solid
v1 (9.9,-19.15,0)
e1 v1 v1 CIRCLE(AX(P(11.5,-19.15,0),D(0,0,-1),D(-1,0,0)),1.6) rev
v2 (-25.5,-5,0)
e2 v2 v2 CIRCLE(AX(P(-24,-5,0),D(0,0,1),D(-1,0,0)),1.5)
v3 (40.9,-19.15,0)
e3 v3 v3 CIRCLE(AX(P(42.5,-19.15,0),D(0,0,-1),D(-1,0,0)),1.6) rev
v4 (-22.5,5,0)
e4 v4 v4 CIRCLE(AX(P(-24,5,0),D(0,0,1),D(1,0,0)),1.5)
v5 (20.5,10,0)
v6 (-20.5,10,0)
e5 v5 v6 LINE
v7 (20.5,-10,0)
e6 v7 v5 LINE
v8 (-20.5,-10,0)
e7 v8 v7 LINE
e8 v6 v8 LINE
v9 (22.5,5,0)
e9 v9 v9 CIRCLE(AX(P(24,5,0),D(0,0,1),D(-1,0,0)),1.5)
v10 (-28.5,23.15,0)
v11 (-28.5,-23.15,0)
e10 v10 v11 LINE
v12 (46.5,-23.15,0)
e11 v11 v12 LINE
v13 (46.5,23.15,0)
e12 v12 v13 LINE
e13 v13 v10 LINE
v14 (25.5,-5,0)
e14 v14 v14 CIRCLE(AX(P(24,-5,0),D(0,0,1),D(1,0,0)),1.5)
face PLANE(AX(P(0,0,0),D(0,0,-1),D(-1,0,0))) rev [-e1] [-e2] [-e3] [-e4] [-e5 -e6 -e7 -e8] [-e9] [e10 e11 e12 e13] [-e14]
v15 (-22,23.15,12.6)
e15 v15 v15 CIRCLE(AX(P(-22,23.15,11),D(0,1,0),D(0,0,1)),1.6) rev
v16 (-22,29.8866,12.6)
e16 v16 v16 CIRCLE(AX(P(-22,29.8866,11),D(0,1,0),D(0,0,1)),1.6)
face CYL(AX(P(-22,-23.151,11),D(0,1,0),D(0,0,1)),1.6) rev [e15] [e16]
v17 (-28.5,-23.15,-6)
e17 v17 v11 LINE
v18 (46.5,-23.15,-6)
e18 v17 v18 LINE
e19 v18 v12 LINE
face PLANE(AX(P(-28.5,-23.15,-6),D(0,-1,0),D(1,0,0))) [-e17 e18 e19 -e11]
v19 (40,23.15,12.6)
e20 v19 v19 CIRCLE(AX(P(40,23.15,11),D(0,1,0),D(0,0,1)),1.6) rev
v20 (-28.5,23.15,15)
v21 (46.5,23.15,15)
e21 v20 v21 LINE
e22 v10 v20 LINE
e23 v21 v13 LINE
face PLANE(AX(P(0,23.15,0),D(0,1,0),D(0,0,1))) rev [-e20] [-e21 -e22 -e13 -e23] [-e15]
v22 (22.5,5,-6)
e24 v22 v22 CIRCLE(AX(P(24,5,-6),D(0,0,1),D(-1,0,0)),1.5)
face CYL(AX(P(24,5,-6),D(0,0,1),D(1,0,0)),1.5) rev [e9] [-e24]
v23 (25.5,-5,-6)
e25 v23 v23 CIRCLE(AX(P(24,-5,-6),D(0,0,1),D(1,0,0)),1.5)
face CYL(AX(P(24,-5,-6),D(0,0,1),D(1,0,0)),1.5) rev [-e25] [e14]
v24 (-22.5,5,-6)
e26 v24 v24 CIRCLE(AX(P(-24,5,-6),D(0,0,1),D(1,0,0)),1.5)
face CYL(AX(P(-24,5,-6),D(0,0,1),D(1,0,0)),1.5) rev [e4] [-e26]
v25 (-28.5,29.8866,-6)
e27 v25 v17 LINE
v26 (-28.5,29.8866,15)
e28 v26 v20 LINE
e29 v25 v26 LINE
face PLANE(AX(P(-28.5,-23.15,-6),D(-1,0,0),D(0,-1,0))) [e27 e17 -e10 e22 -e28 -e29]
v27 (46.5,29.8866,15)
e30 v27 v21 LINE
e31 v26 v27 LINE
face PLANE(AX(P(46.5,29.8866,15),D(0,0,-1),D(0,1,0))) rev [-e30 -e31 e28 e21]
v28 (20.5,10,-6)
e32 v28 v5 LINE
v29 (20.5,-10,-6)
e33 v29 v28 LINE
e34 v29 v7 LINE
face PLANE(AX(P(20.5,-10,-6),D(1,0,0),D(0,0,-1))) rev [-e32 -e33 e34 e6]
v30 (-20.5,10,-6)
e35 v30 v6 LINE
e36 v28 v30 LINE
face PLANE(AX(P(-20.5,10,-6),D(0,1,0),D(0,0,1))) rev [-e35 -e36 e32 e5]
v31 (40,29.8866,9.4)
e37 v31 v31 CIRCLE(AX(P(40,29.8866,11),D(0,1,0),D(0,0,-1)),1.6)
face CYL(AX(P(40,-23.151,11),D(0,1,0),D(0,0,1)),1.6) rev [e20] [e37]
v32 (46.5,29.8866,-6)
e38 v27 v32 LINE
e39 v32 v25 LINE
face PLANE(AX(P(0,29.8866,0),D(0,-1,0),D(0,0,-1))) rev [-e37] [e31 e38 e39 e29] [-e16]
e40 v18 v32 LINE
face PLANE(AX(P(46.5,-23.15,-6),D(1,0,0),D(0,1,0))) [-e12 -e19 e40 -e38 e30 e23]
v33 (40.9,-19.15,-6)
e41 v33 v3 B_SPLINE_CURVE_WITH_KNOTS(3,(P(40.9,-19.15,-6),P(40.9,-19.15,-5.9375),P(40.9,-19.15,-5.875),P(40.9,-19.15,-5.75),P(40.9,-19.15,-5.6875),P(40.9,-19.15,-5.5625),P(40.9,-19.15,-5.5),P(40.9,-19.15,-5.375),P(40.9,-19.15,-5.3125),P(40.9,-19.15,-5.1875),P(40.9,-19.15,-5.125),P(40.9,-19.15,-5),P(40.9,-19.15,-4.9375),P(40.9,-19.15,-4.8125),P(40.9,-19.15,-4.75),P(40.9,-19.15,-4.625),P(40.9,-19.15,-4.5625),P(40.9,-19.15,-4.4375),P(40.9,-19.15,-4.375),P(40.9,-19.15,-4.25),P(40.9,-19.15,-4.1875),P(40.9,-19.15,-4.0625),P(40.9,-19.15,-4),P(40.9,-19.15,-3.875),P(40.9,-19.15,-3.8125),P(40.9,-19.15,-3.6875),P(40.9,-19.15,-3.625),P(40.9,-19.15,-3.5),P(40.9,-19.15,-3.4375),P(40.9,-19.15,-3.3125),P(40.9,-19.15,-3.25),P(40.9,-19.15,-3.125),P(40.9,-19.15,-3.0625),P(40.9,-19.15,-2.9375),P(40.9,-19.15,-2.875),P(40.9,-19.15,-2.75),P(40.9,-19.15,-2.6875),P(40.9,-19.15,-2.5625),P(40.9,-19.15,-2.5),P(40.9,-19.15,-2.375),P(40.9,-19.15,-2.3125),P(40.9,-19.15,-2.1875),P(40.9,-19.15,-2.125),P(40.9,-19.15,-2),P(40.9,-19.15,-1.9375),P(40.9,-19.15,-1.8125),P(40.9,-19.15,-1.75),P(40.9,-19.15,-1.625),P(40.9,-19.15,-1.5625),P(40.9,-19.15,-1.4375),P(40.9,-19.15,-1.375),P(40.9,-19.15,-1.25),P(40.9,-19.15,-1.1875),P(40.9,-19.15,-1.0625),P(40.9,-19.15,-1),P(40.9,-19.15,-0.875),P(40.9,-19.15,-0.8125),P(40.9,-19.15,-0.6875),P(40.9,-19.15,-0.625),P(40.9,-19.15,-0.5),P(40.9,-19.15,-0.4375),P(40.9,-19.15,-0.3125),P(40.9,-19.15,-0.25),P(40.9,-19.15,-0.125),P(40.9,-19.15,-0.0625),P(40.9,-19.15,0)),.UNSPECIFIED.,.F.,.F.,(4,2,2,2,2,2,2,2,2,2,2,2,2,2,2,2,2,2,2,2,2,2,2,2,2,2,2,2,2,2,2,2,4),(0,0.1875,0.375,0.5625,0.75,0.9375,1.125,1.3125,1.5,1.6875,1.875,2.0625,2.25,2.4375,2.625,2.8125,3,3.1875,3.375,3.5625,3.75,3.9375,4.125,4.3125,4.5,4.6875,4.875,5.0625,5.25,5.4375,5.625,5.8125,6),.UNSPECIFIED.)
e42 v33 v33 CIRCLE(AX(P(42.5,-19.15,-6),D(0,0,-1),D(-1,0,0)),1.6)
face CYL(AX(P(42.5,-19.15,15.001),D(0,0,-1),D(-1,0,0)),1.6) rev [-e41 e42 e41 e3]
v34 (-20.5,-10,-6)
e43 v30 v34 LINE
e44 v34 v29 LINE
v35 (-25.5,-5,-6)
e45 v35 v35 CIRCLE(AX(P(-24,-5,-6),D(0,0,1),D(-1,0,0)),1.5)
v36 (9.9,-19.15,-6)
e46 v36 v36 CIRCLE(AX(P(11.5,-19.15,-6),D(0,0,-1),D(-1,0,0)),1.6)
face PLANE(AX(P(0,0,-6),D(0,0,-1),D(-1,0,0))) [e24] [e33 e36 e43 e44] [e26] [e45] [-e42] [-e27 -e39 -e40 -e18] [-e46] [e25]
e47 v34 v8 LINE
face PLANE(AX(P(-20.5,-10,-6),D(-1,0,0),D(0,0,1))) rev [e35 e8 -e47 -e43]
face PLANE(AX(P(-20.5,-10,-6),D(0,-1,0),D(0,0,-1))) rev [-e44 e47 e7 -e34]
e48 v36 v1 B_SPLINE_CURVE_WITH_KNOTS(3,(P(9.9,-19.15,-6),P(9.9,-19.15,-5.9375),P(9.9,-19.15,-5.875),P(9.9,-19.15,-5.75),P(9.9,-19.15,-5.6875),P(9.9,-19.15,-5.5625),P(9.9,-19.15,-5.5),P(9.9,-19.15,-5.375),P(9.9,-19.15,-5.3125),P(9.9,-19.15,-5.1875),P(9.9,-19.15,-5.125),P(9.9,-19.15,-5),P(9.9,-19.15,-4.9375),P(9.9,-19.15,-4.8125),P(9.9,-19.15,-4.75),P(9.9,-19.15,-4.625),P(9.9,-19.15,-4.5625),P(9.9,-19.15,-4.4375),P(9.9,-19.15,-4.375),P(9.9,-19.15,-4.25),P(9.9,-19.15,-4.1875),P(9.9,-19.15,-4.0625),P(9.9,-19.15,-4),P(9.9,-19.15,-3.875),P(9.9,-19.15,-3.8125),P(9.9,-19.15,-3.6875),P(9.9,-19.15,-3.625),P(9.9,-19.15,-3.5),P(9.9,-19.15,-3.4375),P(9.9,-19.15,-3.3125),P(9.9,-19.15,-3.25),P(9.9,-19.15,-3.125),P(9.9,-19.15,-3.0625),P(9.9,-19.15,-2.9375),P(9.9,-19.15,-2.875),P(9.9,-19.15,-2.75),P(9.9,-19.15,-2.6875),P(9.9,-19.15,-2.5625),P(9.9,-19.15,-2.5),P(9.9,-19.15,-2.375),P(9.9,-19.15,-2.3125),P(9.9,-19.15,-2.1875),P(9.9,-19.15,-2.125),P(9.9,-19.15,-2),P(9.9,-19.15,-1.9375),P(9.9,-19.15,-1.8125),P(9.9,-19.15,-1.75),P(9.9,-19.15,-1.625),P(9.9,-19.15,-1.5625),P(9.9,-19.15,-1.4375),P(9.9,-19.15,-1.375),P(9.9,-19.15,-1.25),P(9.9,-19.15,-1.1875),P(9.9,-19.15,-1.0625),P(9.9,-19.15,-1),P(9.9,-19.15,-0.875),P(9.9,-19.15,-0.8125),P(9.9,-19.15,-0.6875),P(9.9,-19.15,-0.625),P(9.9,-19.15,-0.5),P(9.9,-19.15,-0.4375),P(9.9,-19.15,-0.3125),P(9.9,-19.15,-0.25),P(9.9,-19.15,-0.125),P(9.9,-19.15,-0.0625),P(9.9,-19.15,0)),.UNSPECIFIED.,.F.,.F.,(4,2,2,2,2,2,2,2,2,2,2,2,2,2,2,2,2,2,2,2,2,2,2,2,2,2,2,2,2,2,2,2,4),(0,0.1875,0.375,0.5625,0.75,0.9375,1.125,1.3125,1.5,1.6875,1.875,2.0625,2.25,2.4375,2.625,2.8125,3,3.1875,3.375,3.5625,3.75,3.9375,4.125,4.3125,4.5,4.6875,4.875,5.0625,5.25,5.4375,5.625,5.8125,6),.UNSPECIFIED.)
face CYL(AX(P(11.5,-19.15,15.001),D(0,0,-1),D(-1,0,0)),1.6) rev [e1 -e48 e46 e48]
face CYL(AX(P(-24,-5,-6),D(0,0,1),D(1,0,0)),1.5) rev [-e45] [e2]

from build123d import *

# Parameters (mm, degrees)
SKETCH1_W           = 75
SKETCH1_H           = 46.3
SKETCH1_R           = 1.5
SKETCH1_W_2         = 41
SKETCH1_H_2         = 20
BASE_FLANGE2_DEPTH  = 6
EDGE_FLANGE1_DEPTH  = 75
CUT_EXTRUDE1_REACH  = 74.112
SKETCH15_R          = 1.6
CUT_EXTRUDE2_REACH  = 61.131
SKETCH16_R          = 1.6
SKETCH17_W          = 75
SKETCH17_H          = 21
BOSS_EXTRUDE1_DEPTH = 6.7366
CUT_EXTRUDE3_REACH  = 74.112
SKETCH18_R          = 1.6


# Sheet-metal steps are written as plain solids
with BuildPart() as part:
    # Sketch1 → Base-Flange2 (new body)
    with BuildSketch(Plane.XY):
        with Locations((9, 0)):
            Rectangle(SKETCH1_W, SKETCH1_H)
        with Locations((-24, 5)):
            Circle(SKETCH1_R, mode=Mode.SUBTRACT)
        with Locations(Location((24, 5, 0), (0, 0, 180))):
            Circle(SKETCH1_R, mode=Mode.SUBTRACT)
        with Locations((24, -5)):
            Circle(SKETCH1_R, mode=Mode.SUBTRACT)
        with Locations(Location((-24, -5, 0), (0, 0, 180))):
            Circle(SKETCH1_R, mode=Mode.SUBTRACT)
        Rectangle(SKETCH1_W_2, SKETCH1_H_2, mode=Mode.SUBTRACT)
    extrude(amount=-BASE_FLANGE2_DEPTH)

    # Edge-Flange1 section (across the edge) → Edge-Flange1 (add)
    with BuildSketch(Plane(origin=(46.5, 23.8866, 0), x_dir=(0, -1, 0), z_dir=(-1, 0, 0))):
        with BuildLine():
            Line((-6, 0.7366), (-6, 15))
            Line((-6, 15), (0, 15))
            Line((0, 15), (0, 0.7366))
            ThreePointArc((0, 0.7366), (0.215745145, 0.215745145), (0.7366, 0))
            Line((0.7366, 0), (0.7366, -6))
            ThreePointArc((0.7366, -6), (-4.026895542, -4.026895542), (-6, 0.7366))
        make_face()
    extrude(amount=EDGE_FLANGE1_DEPTH)

    # Sketch15 → Cut-Extrude1 (cut, up to next)
    with BuildSketch(Plane(origin=(0, 29.8866, 0), x_dir=(1, 0, 0), z_dir=(0, 1, 0)), mode=Mode.PRIVATE) as cut_extrude1_sk1:
        with Locations(Location((-22, -11, 0), (0, 0, 270))):
            Circle(SKETCH15_R)
    cut_extrude1_tool1 = extrude(cut_extrude1_sk1.sketch, amount=-CUT_EXTRUDE1_REACH, mode=Mode.PRIVATE) & part.part
    # Sketch15 → Cut-Extrude1 (cut, up to next)
    with BuildSketch(Plane(origin=(0, 29.8866, 0), x_dir=(1, 0, 0), z_dir=(0, 1, 0)), mode=Mode.PRIVATE) as cut_extrude1_sk2:
        with Locations(Location((40, -11, 0), (0, 0, 90))):
            Circle(SKETCH15_R)
    cut_extrude1_tool2 = extrude(cut_extrude1_sk2.sketch, amount=-CUT_EXTRUDE1_REACH, mode=Mode.PRIVATE) & part.part
    add(cut_extrude1_tool1.solids().sort_by_distance((-22, 29.8866, 11))[0], mode=Mode.SUBTRACT)
    add(cut_extrude1_tool2.solids().sort_by_distance((40, 29.8866, 11))[0], mode=Mode.SUBTRACT)

    # Sketch16 → Cut-Extrude2 (cut, up to next)
    with BuildSketch(Plane(origin=(0, 0, -6), x_dir=(-1, 0, 0), z_dir=(0, 0, -1)), mode=Mode.PRIVATE) as cut_extrude2_sk1:
        with Locations((-42.5, -19.15)):
            Circle(SKETCH16_R)
    cut_extrude2_tool1 = extrude(cut_extrude2_sk1.sketch, amount=-CUT_EXTRUDE2_REACH, mode=Mode.PRIVATE) & part.part
    # Sketch16 → Cut-Extrude2 (cut, up to next)
    with BuildSketch(Plane(origin=(0, 0, -6), x_dir=(-1, 0, 0), z_dir=(0, 0, -1)), mode=Mode.PRIVATE) as cut_extrude2_sk2:
        with Locations((-11.5, -19.15)):
            Circle(SKETCH16_R)
    cut_extrude2_tool2 = extrude(cut_extrude2_sk2.sketch, amount=-CUT_EXTRUDE2_REACH, mode=Mode.PRIVATE) & part.part
    add(cut_extrude2_tool1.solids().sort_by_distance((42.5, -19.15, -6))[0], mode=Mode.SUBTRACT)
    add(cut_extrude2_tool2.solids().sort_by_distance((11.5, -19.15, -6))[0], mode=Mode.SUBTRACT)

    # Sketch17 → Boss-Extrude1 (add)
    with BuildSketch(Plane(origin=(0, 29.8866, 0), x_dir=(1, 0, 0), z_dir=(0, 1, 0))):
        with Locations((9, -4.5)):
            Rectangle(SKETCH17_W, SKETCH17_H)
    extrude(amount=-BOSS_EXTRUDE1_DEPTH)

    # Sketch18 → Cut-Extrude3 (cut, up to next)
    with BuildSketch(Plane(origin=(0, 29.8866, 0), x_dir=(1, 0, 0), z_dir=(0, 1, 0)), mode=Mode.PRIVATE) as cut_extrude3_sk1:
        with Locations(Location((-22, -11, 0), (0, 0, 270))):
            Circle(SKETCH18_R)
    cut_extrude3_tool1 = extrude(cut_extrude3_sk1.sketch, amount=-CUT_EXTRUDE3_REACH, mode=Mode.PRIVATE) & part.part
    # Sketch18 → Cut-Extrude3 (cut, up to next)
    with BuildSketch(Plane(origin=(0, 29.8866, 0), x_dir=(1, 0, 0), z_dir=(0, 1, 0)), mode=Mode.PRIVATE) as cut_extrude3_sk2:
        with Locations(Location((40, -11, 0), (0, 0, 270))):
            Circle(SKETCH18_R)
    cut_extrude3_tool2 = extrude(cut_extrude3_sk2.sketch, amount=-CUT_EXTRUDE3_REACH, mode=Mode.PRIVATE) & part.part
    add(cut_extrude3_tool1.solids().sort_by_distance((-22, 29.8866, 11))[0], mode=Mode.SUBTRACT)
    add(cut_extrude3_tool2.solids().sort_by_distance((40, 29.8866, 11))[0], mode=Mode.SUBTRACT)


solid = part.part
